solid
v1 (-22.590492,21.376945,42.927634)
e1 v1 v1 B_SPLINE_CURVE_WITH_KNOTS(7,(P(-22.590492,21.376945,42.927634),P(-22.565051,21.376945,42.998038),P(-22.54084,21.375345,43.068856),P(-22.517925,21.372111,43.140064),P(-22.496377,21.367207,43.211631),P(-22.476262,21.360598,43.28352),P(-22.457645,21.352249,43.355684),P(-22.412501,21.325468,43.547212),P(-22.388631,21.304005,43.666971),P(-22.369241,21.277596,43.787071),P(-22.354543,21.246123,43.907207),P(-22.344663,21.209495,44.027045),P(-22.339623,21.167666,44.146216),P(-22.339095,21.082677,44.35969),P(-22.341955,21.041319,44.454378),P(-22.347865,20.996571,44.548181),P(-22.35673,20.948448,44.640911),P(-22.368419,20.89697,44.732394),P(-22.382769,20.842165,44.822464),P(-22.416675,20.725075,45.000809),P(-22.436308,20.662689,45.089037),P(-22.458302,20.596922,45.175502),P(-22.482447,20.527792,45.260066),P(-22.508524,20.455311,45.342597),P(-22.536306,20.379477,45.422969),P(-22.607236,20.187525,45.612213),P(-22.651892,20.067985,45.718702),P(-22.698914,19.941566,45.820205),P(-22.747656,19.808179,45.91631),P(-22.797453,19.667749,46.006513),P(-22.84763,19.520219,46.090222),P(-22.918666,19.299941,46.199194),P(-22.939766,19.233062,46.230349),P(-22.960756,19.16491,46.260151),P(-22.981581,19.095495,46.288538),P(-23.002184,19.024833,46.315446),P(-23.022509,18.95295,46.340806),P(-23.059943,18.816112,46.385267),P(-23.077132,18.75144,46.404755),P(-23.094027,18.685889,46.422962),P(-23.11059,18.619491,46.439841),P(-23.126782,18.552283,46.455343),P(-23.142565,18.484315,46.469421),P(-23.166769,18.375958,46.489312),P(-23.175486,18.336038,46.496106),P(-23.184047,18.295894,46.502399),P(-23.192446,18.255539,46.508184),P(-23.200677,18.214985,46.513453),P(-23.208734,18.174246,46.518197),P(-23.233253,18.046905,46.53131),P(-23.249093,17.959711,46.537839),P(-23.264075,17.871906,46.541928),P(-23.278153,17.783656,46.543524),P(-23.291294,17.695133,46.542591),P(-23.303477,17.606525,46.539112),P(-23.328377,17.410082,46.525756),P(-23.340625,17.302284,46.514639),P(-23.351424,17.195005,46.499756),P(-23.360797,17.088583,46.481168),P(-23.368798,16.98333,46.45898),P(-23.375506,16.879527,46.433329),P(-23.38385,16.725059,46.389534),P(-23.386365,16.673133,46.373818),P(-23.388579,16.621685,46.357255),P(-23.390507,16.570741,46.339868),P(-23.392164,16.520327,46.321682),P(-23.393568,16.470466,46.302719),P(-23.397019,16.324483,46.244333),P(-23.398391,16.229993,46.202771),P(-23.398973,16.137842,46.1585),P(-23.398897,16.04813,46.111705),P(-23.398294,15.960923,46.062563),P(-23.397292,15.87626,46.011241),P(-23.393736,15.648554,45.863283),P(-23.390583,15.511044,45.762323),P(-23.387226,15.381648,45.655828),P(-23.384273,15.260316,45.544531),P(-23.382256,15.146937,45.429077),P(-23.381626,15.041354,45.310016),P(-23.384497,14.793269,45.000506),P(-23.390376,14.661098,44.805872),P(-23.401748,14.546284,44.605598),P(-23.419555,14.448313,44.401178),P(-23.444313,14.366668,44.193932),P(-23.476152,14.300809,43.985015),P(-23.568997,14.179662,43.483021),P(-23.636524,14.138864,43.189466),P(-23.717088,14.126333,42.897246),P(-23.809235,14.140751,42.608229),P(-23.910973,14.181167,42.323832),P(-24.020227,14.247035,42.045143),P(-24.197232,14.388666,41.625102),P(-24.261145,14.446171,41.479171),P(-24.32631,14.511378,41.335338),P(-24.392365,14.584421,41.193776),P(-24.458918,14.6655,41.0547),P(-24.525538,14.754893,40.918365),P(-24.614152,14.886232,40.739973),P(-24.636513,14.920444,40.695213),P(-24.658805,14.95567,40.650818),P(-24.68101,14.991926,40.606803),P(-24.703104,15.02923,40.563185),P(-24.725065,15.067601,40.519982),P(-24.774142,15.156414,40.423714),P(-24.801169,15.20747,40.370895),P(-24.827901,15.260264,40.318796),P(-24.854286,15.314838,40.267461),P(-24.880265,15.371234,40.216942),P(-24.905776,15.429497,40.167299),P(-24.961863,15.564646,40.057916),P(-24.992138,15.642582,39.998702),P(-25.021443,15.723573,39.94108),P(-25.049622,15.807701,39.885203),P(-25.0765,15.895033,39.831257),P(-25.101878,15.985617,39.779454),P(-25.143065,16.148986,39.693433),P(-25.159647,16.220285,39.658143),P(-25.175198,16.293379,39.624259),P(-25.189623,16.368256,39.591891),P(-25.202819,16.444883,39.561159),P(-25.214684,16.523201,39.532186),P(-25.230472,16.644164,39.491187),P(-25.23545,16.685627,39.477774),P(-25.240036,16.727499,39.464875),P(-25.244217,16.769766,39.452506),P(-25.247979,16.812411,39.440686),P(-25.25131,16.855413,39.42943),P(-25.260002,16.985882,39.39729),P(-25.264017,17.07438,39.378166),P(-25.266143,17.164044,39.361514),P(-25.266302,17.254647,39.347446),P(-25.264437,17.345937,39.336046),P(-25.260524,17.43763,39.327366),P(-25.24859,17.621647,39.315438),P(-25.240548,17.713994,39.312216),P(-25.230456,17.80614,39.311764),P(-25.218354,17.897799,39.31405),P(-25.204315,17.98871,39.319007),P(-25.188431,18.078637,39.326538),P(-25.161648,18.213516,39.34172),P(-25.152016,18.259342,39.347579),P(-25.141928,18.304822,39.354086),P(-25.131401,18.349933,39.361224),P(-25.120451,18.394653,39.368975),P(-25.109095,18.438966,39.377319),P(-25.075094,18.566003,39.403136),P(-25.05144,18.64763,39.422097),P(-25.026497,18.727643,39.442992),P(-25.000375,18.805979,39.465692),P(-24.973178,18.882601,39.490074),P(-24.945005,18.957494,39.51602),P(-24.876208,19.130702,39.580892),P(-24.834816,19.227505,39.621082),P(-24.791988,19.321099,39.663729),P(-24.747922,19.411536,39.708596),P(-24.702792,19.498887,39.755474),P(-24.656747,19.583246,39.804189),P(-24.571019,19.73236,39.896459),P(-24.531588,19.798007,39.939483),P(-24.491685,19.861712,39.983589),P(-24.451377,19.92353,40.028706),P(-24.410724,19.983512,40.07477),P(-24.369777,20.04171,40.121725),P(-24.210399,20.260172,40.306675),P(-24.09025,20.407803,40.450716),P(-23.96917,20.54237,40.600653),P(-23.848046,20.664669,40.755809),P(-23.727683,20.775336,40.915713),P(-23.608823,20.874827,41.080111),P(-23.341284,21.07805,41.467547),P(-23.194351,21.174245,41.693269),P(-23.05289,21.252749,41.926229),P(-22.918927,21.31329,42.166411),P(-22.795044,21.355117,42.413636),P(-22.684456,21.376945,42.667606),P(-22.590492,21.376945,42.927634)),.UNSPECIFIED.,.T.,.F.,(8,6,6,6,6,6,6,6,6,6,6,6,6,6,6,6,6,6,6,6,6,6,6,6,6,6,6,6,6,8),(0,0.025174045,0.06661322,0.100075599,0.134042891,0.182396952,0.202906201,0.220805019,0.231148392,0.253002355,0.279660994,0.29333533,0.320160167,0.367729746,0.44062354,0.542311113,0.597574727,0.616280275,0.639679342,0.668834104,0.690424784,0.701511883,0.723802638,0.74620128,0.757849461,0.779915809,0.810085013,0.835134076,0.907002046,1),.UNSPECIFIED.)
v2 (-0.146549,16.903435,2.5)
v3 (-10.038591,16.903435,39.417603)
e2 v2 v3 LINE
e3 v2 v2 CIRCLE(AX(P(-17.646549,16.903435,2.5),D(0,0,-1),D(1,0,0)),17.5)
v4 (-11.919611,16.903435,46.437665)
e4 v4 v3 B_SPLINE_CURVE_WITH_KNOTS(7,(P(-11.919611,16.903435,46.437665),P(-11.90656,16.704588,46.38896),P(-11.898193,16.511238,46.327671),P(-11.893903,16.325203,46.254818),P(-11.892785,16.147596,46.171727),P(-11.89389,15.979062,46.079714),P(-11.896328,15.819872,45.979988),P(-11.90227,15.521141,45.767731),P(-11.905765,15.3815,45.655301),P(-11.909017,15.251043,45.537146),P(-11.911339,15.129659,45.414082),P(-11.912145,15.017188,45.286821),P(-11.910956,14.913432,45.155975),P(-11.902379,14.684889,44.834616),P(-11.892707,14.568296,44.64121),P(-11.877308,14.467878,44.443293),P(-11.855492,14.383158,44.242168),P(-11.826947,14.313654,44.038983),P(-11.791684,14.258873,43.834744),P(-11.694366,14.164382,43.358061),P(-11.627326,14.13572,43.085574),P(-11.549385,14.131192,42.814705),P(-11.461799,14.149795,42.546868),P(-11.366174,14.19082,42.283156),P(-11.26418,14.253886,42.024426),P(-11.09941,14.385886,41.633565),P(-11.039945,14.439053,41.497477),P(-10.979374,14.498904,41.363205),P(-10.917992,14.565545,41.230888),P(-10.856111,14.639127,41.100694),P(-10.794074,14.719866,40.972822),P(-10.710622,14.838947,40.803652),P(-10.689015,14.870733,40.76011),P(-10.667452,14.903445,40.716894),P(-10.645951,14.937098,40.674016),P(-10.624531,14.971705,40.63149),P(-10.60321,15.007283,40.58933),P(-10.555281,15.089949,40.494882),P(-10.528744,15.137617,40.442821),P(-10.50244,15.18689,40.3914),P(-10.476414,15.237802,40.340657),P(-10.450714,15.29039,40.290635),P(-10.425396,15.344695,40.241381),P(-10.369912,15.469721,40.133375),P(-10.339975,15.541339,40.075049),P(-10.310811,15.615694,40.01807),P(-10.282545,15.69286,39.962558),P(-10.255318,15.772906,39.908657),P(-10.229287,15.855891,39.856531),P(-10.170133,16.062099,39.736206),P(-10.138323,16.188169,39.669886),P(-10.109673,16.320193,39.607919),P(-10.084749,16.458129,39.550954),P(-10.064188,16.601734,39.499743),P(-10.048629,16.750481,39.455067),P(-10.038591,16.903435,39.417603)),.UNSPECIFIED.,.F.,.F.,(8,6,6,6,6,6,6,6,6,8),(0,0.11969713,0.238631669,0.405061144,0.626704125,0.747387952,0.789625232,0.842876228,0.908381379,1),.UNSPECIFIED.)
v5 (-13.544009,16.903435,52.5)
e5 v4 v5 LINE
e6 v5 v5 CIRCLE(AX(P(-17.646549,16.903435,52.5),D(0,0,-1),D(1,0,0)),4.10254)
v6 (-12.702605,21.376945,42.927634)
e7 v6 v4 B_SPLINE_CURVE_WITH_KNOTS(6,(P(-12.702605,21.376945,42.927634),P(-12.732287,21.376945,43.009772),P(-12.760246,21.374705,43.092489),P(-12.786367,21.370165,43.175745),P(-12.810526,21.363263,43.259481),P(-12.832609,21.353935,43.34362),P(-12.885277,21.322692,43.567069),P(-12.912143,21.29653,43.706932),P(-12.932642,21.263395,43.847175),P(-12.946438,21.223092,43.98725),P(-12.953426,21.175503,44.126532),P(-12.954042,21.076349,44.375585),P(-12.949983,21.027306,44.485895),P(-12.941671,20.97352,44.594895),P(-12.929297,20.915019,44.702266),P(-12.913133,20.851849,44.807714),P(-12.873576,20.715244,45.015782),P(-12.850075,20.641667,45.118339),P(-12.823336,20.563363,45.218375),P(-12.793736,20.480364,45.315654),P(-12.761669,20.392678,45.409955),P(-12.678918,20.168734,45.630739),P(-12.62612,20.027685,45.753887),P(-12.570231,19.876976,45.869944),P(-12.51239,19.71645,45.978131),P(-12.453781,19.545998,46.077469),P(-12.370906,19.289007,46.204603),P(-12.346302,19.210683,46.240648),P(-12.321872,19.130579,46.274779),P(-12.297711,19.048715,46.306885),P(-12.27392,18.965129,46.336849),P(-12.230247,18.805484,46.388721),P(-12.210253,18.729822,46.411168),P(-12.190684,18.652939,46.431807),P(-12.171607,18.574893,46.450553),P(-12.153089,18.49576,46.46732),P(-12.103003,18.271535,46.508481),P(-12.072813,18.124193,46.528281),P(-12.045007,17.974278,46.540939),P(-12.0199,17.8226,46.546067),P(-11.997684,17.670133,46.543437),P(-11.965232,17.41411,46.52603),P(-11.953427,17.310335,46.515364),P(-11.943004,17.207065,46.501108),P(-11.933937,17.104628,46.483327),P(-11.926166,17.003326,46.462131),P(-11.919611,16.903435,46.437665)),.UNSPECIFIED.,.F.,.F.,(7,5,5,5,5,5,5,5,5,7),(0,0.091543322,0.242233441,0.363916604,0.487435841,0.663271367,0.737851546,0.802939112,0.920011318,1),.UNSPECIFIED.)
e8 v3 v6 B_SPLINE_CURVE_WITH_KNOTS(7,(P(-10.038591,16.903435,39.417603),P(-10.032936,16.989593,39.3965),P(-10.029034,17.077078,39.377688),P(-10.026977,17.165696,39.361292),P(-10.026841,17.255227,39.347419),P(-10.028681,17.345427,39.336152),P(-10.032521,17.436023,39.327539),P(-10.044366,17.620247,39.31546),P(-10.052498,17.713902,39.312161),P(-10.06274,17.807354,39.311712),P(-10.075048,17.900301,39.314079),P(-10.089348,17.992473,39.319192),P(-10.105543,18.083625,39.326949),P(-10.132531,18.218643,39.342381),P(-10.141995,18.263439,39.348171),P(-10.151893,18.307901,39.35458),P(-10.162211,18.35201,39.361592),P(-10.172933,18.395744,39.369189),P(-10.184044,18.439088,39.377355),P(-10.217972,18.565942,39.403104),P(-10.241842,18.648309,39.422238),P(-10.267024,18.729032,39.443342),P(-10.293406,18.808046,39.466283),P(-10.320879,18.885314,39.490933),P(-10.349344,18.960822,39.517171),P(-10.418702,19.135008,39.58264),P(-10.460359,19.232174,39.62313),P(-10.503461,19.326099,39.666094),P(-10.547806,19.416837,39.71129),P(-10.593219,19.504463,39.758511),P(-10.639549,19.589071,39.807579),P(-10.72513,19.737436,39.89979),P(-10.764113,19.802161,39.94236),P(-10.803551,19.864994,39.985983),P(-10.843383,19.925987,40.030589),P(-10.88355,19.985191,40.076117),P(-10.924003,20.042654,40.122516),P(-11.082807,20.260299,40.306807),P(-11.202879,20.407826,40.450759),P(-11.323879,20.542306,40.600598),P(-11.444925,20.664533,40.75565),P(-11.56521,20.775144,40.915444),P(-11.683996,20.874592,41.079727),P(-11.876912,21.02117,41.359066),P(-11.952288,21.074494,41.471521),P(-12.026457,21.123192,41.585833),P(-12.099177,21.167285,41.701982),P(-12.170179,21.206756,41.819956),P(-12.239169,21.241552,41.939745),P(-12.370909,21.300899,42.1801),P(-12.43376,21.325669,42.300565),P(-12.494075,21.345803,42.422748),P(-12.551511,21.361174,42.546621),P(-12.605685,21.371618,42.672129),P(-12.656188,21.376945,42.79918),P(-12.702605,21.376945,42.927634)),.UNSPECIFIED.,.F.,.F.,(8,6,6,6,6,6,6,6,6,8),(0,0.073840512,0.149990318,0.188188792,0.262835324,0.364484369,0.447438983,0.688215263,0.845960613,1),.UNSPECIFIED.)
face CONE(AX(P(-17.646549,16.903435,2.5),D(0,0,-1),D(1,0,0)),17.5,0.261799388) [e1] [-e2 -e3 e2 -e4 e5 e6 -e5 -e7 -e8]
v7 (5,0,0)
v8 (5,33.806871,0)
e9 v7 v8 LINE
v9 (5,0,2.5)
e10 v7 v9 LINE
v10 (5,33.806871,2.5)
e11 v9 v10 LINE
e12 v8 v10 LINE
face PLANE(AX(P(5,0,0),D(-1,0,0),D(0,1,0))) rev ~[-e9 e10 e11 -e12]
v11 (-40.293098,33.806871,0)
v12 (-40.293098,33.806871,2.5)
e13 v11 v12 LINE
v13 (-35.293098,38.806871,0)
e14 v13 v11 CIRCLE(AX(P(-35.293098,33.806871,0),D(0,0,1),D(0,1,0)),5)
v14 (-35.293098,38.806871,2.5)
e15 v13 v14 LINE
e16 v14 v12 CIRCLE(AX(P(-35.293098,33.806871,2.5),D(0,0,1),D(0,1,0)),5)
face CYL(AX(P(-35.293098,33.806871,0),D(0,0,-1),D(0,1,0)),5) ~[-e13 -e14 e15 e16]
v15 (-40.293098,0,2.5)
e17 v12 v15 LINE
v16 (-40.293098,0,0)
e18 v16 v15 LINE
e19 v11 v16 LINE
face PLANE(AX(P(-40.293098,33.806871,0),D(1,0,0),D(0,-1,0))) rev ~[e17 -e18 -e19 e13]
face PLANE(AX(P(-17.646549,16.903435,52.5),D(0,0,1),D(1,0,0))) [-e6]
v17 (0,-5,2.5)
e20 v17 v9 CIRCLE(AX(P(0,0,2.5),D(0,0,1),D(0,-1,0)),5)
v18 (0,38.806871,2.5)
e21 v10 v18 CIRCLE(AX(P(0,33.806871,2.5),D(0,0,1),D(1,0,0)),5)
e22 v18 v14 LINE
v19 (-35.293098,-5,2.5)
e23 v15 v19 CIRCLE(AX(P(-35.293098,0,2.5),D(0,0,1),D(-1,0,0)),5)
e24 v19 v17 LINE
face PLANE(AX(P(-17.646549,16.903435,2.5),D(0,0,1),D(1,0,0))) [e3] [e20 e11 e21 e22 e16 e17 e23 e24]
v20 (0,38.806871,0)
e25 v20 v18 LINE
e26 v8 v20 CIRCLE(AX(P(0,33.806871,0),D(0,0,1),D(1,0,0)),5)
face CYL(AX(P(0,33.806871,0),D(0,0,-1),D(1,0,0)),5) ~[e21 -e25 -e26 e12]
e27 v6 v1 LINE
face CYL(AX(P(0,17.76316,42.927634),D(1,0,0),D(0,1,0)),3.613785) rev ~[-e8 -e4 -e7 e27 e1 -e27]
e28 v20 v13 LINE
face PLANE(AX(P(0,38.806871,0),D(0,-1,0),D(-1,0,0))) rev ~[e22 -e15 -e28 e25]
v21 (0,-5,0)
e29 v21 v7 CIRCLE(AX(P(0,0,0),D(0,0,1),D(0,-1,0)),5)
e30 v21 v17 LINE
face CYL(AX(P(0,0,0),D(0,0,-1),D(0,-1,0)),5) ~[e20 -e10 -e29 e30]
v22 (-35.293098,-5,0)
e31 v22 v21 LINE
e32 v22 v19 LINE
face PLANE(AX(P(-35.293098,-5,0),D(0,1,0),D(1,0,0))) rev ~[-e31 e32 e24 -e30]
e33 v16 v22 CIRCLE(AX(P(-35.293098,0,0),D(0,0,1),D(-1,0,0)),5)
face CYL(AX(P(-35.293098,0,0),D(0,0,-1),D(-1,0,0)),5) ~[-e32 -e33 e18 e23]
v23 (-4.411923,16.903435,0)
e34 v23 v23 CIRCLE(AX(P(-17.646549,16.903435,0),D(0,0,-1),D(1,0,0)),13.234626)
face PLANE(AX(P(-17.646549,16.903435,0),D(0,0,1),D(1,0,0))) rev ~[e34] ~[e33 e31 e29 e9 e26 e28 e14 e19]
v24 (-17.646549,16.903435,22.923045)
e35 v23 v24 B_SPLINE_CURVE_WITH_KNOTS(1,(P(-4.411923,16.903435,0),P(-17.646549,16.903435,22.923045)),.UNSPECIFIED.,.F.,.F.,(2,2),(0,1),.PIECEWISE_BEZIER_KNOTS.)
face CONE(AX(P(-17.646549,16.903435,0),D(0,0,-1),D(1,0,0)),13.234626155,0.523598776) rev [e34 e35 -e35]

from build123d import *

# Parameters (mm, degrees)
F0_R     = 17.5
F1_DEPTH = 2.5
F2_R     = 17.5
F3_DEPTH = 50
F3_TAPER = 15
F4_R     = 3.6137849114
F5_DEPTH = 60
F6_R     = 13.2346261553


# Not quite as in the source:
# - an extrude whose draft closes it to a point is written as a loft to that point


with BuildPart() as f1:
    # F0 (on Top) → F1 (new body)
    with BuildSketch(Plane.XY):
        with BuildLine():
            Line((0, 38.8068709316), (-35.2930977718, 38.8068709316))
            ThreePointArc((-35.2930977718, 38.8068709316), (-38.8286316778, 37.3424048375), (-40.2930977718, 33.8068709316))
            Line((-40.2930977718, 33.8068709316), (-40.2930977718, 0))
            ThreePointArc((-40.2930977718, 0), (-38.8286316778, -3.5355339059), (-35.2930977718, -5))
            Line((-35.2930977718, -5), (0, -5))
            ThreePointArc((0, -5), (3.5355339059, -3.5355339059), (5, 0))
            Line((5, 0), (5, 33.8068709316))
            ThreePointArc((5, 33.8068709316), (3.5355339059, 37.3424048375), (0, 38.8068709316))
        make_face()
        with Locations((-17.6465488859, 16.9034354658)):
            Circle(F0_R, mode=Mode.SUBTRACT)
        with Locations((-17.6465488859, 16.9034354658)):
            Circle(F0_R)
    extrude(amount=F1_DEPTH)

    # F2 (on face) → F3 (join)
    with BuildSketch(Plane.XY.offset(2.5)):
        with Locations((-17.6465488859, 16.9034354658)):
            Circle(F2_R)
    extrude(amount=F3_DEPTH, taper=F3_TAPER)

    # F4 (on Right) → F5 (cut)
    with BuildSketch(Plane.YZ):
        with Locations((17.7631601691, 42.927633971)):
            Circle(F4_R)
    extrude(amount=-F5_DEPTH, mode=Mode.SUBTRACT)

    # F6 (on face) → F7 section 0
    with BuildSketch(Plane(origin=(0, 0, 0), x_dir=(1, 0, 0), z_dir=(0, 0, -1)), mode=Mode.PRIVATE) as f7_s0:
        with Locations((-17.6465488859, -16.9034354658)):
            Circle(F6_R)
    loft([f7_s0.sketch, Vertex(-17.6465488859, 16.9034354658, 22.9230449201)], ruled=True, mode=Mode.SUBTRACT)


solid = f1.part
